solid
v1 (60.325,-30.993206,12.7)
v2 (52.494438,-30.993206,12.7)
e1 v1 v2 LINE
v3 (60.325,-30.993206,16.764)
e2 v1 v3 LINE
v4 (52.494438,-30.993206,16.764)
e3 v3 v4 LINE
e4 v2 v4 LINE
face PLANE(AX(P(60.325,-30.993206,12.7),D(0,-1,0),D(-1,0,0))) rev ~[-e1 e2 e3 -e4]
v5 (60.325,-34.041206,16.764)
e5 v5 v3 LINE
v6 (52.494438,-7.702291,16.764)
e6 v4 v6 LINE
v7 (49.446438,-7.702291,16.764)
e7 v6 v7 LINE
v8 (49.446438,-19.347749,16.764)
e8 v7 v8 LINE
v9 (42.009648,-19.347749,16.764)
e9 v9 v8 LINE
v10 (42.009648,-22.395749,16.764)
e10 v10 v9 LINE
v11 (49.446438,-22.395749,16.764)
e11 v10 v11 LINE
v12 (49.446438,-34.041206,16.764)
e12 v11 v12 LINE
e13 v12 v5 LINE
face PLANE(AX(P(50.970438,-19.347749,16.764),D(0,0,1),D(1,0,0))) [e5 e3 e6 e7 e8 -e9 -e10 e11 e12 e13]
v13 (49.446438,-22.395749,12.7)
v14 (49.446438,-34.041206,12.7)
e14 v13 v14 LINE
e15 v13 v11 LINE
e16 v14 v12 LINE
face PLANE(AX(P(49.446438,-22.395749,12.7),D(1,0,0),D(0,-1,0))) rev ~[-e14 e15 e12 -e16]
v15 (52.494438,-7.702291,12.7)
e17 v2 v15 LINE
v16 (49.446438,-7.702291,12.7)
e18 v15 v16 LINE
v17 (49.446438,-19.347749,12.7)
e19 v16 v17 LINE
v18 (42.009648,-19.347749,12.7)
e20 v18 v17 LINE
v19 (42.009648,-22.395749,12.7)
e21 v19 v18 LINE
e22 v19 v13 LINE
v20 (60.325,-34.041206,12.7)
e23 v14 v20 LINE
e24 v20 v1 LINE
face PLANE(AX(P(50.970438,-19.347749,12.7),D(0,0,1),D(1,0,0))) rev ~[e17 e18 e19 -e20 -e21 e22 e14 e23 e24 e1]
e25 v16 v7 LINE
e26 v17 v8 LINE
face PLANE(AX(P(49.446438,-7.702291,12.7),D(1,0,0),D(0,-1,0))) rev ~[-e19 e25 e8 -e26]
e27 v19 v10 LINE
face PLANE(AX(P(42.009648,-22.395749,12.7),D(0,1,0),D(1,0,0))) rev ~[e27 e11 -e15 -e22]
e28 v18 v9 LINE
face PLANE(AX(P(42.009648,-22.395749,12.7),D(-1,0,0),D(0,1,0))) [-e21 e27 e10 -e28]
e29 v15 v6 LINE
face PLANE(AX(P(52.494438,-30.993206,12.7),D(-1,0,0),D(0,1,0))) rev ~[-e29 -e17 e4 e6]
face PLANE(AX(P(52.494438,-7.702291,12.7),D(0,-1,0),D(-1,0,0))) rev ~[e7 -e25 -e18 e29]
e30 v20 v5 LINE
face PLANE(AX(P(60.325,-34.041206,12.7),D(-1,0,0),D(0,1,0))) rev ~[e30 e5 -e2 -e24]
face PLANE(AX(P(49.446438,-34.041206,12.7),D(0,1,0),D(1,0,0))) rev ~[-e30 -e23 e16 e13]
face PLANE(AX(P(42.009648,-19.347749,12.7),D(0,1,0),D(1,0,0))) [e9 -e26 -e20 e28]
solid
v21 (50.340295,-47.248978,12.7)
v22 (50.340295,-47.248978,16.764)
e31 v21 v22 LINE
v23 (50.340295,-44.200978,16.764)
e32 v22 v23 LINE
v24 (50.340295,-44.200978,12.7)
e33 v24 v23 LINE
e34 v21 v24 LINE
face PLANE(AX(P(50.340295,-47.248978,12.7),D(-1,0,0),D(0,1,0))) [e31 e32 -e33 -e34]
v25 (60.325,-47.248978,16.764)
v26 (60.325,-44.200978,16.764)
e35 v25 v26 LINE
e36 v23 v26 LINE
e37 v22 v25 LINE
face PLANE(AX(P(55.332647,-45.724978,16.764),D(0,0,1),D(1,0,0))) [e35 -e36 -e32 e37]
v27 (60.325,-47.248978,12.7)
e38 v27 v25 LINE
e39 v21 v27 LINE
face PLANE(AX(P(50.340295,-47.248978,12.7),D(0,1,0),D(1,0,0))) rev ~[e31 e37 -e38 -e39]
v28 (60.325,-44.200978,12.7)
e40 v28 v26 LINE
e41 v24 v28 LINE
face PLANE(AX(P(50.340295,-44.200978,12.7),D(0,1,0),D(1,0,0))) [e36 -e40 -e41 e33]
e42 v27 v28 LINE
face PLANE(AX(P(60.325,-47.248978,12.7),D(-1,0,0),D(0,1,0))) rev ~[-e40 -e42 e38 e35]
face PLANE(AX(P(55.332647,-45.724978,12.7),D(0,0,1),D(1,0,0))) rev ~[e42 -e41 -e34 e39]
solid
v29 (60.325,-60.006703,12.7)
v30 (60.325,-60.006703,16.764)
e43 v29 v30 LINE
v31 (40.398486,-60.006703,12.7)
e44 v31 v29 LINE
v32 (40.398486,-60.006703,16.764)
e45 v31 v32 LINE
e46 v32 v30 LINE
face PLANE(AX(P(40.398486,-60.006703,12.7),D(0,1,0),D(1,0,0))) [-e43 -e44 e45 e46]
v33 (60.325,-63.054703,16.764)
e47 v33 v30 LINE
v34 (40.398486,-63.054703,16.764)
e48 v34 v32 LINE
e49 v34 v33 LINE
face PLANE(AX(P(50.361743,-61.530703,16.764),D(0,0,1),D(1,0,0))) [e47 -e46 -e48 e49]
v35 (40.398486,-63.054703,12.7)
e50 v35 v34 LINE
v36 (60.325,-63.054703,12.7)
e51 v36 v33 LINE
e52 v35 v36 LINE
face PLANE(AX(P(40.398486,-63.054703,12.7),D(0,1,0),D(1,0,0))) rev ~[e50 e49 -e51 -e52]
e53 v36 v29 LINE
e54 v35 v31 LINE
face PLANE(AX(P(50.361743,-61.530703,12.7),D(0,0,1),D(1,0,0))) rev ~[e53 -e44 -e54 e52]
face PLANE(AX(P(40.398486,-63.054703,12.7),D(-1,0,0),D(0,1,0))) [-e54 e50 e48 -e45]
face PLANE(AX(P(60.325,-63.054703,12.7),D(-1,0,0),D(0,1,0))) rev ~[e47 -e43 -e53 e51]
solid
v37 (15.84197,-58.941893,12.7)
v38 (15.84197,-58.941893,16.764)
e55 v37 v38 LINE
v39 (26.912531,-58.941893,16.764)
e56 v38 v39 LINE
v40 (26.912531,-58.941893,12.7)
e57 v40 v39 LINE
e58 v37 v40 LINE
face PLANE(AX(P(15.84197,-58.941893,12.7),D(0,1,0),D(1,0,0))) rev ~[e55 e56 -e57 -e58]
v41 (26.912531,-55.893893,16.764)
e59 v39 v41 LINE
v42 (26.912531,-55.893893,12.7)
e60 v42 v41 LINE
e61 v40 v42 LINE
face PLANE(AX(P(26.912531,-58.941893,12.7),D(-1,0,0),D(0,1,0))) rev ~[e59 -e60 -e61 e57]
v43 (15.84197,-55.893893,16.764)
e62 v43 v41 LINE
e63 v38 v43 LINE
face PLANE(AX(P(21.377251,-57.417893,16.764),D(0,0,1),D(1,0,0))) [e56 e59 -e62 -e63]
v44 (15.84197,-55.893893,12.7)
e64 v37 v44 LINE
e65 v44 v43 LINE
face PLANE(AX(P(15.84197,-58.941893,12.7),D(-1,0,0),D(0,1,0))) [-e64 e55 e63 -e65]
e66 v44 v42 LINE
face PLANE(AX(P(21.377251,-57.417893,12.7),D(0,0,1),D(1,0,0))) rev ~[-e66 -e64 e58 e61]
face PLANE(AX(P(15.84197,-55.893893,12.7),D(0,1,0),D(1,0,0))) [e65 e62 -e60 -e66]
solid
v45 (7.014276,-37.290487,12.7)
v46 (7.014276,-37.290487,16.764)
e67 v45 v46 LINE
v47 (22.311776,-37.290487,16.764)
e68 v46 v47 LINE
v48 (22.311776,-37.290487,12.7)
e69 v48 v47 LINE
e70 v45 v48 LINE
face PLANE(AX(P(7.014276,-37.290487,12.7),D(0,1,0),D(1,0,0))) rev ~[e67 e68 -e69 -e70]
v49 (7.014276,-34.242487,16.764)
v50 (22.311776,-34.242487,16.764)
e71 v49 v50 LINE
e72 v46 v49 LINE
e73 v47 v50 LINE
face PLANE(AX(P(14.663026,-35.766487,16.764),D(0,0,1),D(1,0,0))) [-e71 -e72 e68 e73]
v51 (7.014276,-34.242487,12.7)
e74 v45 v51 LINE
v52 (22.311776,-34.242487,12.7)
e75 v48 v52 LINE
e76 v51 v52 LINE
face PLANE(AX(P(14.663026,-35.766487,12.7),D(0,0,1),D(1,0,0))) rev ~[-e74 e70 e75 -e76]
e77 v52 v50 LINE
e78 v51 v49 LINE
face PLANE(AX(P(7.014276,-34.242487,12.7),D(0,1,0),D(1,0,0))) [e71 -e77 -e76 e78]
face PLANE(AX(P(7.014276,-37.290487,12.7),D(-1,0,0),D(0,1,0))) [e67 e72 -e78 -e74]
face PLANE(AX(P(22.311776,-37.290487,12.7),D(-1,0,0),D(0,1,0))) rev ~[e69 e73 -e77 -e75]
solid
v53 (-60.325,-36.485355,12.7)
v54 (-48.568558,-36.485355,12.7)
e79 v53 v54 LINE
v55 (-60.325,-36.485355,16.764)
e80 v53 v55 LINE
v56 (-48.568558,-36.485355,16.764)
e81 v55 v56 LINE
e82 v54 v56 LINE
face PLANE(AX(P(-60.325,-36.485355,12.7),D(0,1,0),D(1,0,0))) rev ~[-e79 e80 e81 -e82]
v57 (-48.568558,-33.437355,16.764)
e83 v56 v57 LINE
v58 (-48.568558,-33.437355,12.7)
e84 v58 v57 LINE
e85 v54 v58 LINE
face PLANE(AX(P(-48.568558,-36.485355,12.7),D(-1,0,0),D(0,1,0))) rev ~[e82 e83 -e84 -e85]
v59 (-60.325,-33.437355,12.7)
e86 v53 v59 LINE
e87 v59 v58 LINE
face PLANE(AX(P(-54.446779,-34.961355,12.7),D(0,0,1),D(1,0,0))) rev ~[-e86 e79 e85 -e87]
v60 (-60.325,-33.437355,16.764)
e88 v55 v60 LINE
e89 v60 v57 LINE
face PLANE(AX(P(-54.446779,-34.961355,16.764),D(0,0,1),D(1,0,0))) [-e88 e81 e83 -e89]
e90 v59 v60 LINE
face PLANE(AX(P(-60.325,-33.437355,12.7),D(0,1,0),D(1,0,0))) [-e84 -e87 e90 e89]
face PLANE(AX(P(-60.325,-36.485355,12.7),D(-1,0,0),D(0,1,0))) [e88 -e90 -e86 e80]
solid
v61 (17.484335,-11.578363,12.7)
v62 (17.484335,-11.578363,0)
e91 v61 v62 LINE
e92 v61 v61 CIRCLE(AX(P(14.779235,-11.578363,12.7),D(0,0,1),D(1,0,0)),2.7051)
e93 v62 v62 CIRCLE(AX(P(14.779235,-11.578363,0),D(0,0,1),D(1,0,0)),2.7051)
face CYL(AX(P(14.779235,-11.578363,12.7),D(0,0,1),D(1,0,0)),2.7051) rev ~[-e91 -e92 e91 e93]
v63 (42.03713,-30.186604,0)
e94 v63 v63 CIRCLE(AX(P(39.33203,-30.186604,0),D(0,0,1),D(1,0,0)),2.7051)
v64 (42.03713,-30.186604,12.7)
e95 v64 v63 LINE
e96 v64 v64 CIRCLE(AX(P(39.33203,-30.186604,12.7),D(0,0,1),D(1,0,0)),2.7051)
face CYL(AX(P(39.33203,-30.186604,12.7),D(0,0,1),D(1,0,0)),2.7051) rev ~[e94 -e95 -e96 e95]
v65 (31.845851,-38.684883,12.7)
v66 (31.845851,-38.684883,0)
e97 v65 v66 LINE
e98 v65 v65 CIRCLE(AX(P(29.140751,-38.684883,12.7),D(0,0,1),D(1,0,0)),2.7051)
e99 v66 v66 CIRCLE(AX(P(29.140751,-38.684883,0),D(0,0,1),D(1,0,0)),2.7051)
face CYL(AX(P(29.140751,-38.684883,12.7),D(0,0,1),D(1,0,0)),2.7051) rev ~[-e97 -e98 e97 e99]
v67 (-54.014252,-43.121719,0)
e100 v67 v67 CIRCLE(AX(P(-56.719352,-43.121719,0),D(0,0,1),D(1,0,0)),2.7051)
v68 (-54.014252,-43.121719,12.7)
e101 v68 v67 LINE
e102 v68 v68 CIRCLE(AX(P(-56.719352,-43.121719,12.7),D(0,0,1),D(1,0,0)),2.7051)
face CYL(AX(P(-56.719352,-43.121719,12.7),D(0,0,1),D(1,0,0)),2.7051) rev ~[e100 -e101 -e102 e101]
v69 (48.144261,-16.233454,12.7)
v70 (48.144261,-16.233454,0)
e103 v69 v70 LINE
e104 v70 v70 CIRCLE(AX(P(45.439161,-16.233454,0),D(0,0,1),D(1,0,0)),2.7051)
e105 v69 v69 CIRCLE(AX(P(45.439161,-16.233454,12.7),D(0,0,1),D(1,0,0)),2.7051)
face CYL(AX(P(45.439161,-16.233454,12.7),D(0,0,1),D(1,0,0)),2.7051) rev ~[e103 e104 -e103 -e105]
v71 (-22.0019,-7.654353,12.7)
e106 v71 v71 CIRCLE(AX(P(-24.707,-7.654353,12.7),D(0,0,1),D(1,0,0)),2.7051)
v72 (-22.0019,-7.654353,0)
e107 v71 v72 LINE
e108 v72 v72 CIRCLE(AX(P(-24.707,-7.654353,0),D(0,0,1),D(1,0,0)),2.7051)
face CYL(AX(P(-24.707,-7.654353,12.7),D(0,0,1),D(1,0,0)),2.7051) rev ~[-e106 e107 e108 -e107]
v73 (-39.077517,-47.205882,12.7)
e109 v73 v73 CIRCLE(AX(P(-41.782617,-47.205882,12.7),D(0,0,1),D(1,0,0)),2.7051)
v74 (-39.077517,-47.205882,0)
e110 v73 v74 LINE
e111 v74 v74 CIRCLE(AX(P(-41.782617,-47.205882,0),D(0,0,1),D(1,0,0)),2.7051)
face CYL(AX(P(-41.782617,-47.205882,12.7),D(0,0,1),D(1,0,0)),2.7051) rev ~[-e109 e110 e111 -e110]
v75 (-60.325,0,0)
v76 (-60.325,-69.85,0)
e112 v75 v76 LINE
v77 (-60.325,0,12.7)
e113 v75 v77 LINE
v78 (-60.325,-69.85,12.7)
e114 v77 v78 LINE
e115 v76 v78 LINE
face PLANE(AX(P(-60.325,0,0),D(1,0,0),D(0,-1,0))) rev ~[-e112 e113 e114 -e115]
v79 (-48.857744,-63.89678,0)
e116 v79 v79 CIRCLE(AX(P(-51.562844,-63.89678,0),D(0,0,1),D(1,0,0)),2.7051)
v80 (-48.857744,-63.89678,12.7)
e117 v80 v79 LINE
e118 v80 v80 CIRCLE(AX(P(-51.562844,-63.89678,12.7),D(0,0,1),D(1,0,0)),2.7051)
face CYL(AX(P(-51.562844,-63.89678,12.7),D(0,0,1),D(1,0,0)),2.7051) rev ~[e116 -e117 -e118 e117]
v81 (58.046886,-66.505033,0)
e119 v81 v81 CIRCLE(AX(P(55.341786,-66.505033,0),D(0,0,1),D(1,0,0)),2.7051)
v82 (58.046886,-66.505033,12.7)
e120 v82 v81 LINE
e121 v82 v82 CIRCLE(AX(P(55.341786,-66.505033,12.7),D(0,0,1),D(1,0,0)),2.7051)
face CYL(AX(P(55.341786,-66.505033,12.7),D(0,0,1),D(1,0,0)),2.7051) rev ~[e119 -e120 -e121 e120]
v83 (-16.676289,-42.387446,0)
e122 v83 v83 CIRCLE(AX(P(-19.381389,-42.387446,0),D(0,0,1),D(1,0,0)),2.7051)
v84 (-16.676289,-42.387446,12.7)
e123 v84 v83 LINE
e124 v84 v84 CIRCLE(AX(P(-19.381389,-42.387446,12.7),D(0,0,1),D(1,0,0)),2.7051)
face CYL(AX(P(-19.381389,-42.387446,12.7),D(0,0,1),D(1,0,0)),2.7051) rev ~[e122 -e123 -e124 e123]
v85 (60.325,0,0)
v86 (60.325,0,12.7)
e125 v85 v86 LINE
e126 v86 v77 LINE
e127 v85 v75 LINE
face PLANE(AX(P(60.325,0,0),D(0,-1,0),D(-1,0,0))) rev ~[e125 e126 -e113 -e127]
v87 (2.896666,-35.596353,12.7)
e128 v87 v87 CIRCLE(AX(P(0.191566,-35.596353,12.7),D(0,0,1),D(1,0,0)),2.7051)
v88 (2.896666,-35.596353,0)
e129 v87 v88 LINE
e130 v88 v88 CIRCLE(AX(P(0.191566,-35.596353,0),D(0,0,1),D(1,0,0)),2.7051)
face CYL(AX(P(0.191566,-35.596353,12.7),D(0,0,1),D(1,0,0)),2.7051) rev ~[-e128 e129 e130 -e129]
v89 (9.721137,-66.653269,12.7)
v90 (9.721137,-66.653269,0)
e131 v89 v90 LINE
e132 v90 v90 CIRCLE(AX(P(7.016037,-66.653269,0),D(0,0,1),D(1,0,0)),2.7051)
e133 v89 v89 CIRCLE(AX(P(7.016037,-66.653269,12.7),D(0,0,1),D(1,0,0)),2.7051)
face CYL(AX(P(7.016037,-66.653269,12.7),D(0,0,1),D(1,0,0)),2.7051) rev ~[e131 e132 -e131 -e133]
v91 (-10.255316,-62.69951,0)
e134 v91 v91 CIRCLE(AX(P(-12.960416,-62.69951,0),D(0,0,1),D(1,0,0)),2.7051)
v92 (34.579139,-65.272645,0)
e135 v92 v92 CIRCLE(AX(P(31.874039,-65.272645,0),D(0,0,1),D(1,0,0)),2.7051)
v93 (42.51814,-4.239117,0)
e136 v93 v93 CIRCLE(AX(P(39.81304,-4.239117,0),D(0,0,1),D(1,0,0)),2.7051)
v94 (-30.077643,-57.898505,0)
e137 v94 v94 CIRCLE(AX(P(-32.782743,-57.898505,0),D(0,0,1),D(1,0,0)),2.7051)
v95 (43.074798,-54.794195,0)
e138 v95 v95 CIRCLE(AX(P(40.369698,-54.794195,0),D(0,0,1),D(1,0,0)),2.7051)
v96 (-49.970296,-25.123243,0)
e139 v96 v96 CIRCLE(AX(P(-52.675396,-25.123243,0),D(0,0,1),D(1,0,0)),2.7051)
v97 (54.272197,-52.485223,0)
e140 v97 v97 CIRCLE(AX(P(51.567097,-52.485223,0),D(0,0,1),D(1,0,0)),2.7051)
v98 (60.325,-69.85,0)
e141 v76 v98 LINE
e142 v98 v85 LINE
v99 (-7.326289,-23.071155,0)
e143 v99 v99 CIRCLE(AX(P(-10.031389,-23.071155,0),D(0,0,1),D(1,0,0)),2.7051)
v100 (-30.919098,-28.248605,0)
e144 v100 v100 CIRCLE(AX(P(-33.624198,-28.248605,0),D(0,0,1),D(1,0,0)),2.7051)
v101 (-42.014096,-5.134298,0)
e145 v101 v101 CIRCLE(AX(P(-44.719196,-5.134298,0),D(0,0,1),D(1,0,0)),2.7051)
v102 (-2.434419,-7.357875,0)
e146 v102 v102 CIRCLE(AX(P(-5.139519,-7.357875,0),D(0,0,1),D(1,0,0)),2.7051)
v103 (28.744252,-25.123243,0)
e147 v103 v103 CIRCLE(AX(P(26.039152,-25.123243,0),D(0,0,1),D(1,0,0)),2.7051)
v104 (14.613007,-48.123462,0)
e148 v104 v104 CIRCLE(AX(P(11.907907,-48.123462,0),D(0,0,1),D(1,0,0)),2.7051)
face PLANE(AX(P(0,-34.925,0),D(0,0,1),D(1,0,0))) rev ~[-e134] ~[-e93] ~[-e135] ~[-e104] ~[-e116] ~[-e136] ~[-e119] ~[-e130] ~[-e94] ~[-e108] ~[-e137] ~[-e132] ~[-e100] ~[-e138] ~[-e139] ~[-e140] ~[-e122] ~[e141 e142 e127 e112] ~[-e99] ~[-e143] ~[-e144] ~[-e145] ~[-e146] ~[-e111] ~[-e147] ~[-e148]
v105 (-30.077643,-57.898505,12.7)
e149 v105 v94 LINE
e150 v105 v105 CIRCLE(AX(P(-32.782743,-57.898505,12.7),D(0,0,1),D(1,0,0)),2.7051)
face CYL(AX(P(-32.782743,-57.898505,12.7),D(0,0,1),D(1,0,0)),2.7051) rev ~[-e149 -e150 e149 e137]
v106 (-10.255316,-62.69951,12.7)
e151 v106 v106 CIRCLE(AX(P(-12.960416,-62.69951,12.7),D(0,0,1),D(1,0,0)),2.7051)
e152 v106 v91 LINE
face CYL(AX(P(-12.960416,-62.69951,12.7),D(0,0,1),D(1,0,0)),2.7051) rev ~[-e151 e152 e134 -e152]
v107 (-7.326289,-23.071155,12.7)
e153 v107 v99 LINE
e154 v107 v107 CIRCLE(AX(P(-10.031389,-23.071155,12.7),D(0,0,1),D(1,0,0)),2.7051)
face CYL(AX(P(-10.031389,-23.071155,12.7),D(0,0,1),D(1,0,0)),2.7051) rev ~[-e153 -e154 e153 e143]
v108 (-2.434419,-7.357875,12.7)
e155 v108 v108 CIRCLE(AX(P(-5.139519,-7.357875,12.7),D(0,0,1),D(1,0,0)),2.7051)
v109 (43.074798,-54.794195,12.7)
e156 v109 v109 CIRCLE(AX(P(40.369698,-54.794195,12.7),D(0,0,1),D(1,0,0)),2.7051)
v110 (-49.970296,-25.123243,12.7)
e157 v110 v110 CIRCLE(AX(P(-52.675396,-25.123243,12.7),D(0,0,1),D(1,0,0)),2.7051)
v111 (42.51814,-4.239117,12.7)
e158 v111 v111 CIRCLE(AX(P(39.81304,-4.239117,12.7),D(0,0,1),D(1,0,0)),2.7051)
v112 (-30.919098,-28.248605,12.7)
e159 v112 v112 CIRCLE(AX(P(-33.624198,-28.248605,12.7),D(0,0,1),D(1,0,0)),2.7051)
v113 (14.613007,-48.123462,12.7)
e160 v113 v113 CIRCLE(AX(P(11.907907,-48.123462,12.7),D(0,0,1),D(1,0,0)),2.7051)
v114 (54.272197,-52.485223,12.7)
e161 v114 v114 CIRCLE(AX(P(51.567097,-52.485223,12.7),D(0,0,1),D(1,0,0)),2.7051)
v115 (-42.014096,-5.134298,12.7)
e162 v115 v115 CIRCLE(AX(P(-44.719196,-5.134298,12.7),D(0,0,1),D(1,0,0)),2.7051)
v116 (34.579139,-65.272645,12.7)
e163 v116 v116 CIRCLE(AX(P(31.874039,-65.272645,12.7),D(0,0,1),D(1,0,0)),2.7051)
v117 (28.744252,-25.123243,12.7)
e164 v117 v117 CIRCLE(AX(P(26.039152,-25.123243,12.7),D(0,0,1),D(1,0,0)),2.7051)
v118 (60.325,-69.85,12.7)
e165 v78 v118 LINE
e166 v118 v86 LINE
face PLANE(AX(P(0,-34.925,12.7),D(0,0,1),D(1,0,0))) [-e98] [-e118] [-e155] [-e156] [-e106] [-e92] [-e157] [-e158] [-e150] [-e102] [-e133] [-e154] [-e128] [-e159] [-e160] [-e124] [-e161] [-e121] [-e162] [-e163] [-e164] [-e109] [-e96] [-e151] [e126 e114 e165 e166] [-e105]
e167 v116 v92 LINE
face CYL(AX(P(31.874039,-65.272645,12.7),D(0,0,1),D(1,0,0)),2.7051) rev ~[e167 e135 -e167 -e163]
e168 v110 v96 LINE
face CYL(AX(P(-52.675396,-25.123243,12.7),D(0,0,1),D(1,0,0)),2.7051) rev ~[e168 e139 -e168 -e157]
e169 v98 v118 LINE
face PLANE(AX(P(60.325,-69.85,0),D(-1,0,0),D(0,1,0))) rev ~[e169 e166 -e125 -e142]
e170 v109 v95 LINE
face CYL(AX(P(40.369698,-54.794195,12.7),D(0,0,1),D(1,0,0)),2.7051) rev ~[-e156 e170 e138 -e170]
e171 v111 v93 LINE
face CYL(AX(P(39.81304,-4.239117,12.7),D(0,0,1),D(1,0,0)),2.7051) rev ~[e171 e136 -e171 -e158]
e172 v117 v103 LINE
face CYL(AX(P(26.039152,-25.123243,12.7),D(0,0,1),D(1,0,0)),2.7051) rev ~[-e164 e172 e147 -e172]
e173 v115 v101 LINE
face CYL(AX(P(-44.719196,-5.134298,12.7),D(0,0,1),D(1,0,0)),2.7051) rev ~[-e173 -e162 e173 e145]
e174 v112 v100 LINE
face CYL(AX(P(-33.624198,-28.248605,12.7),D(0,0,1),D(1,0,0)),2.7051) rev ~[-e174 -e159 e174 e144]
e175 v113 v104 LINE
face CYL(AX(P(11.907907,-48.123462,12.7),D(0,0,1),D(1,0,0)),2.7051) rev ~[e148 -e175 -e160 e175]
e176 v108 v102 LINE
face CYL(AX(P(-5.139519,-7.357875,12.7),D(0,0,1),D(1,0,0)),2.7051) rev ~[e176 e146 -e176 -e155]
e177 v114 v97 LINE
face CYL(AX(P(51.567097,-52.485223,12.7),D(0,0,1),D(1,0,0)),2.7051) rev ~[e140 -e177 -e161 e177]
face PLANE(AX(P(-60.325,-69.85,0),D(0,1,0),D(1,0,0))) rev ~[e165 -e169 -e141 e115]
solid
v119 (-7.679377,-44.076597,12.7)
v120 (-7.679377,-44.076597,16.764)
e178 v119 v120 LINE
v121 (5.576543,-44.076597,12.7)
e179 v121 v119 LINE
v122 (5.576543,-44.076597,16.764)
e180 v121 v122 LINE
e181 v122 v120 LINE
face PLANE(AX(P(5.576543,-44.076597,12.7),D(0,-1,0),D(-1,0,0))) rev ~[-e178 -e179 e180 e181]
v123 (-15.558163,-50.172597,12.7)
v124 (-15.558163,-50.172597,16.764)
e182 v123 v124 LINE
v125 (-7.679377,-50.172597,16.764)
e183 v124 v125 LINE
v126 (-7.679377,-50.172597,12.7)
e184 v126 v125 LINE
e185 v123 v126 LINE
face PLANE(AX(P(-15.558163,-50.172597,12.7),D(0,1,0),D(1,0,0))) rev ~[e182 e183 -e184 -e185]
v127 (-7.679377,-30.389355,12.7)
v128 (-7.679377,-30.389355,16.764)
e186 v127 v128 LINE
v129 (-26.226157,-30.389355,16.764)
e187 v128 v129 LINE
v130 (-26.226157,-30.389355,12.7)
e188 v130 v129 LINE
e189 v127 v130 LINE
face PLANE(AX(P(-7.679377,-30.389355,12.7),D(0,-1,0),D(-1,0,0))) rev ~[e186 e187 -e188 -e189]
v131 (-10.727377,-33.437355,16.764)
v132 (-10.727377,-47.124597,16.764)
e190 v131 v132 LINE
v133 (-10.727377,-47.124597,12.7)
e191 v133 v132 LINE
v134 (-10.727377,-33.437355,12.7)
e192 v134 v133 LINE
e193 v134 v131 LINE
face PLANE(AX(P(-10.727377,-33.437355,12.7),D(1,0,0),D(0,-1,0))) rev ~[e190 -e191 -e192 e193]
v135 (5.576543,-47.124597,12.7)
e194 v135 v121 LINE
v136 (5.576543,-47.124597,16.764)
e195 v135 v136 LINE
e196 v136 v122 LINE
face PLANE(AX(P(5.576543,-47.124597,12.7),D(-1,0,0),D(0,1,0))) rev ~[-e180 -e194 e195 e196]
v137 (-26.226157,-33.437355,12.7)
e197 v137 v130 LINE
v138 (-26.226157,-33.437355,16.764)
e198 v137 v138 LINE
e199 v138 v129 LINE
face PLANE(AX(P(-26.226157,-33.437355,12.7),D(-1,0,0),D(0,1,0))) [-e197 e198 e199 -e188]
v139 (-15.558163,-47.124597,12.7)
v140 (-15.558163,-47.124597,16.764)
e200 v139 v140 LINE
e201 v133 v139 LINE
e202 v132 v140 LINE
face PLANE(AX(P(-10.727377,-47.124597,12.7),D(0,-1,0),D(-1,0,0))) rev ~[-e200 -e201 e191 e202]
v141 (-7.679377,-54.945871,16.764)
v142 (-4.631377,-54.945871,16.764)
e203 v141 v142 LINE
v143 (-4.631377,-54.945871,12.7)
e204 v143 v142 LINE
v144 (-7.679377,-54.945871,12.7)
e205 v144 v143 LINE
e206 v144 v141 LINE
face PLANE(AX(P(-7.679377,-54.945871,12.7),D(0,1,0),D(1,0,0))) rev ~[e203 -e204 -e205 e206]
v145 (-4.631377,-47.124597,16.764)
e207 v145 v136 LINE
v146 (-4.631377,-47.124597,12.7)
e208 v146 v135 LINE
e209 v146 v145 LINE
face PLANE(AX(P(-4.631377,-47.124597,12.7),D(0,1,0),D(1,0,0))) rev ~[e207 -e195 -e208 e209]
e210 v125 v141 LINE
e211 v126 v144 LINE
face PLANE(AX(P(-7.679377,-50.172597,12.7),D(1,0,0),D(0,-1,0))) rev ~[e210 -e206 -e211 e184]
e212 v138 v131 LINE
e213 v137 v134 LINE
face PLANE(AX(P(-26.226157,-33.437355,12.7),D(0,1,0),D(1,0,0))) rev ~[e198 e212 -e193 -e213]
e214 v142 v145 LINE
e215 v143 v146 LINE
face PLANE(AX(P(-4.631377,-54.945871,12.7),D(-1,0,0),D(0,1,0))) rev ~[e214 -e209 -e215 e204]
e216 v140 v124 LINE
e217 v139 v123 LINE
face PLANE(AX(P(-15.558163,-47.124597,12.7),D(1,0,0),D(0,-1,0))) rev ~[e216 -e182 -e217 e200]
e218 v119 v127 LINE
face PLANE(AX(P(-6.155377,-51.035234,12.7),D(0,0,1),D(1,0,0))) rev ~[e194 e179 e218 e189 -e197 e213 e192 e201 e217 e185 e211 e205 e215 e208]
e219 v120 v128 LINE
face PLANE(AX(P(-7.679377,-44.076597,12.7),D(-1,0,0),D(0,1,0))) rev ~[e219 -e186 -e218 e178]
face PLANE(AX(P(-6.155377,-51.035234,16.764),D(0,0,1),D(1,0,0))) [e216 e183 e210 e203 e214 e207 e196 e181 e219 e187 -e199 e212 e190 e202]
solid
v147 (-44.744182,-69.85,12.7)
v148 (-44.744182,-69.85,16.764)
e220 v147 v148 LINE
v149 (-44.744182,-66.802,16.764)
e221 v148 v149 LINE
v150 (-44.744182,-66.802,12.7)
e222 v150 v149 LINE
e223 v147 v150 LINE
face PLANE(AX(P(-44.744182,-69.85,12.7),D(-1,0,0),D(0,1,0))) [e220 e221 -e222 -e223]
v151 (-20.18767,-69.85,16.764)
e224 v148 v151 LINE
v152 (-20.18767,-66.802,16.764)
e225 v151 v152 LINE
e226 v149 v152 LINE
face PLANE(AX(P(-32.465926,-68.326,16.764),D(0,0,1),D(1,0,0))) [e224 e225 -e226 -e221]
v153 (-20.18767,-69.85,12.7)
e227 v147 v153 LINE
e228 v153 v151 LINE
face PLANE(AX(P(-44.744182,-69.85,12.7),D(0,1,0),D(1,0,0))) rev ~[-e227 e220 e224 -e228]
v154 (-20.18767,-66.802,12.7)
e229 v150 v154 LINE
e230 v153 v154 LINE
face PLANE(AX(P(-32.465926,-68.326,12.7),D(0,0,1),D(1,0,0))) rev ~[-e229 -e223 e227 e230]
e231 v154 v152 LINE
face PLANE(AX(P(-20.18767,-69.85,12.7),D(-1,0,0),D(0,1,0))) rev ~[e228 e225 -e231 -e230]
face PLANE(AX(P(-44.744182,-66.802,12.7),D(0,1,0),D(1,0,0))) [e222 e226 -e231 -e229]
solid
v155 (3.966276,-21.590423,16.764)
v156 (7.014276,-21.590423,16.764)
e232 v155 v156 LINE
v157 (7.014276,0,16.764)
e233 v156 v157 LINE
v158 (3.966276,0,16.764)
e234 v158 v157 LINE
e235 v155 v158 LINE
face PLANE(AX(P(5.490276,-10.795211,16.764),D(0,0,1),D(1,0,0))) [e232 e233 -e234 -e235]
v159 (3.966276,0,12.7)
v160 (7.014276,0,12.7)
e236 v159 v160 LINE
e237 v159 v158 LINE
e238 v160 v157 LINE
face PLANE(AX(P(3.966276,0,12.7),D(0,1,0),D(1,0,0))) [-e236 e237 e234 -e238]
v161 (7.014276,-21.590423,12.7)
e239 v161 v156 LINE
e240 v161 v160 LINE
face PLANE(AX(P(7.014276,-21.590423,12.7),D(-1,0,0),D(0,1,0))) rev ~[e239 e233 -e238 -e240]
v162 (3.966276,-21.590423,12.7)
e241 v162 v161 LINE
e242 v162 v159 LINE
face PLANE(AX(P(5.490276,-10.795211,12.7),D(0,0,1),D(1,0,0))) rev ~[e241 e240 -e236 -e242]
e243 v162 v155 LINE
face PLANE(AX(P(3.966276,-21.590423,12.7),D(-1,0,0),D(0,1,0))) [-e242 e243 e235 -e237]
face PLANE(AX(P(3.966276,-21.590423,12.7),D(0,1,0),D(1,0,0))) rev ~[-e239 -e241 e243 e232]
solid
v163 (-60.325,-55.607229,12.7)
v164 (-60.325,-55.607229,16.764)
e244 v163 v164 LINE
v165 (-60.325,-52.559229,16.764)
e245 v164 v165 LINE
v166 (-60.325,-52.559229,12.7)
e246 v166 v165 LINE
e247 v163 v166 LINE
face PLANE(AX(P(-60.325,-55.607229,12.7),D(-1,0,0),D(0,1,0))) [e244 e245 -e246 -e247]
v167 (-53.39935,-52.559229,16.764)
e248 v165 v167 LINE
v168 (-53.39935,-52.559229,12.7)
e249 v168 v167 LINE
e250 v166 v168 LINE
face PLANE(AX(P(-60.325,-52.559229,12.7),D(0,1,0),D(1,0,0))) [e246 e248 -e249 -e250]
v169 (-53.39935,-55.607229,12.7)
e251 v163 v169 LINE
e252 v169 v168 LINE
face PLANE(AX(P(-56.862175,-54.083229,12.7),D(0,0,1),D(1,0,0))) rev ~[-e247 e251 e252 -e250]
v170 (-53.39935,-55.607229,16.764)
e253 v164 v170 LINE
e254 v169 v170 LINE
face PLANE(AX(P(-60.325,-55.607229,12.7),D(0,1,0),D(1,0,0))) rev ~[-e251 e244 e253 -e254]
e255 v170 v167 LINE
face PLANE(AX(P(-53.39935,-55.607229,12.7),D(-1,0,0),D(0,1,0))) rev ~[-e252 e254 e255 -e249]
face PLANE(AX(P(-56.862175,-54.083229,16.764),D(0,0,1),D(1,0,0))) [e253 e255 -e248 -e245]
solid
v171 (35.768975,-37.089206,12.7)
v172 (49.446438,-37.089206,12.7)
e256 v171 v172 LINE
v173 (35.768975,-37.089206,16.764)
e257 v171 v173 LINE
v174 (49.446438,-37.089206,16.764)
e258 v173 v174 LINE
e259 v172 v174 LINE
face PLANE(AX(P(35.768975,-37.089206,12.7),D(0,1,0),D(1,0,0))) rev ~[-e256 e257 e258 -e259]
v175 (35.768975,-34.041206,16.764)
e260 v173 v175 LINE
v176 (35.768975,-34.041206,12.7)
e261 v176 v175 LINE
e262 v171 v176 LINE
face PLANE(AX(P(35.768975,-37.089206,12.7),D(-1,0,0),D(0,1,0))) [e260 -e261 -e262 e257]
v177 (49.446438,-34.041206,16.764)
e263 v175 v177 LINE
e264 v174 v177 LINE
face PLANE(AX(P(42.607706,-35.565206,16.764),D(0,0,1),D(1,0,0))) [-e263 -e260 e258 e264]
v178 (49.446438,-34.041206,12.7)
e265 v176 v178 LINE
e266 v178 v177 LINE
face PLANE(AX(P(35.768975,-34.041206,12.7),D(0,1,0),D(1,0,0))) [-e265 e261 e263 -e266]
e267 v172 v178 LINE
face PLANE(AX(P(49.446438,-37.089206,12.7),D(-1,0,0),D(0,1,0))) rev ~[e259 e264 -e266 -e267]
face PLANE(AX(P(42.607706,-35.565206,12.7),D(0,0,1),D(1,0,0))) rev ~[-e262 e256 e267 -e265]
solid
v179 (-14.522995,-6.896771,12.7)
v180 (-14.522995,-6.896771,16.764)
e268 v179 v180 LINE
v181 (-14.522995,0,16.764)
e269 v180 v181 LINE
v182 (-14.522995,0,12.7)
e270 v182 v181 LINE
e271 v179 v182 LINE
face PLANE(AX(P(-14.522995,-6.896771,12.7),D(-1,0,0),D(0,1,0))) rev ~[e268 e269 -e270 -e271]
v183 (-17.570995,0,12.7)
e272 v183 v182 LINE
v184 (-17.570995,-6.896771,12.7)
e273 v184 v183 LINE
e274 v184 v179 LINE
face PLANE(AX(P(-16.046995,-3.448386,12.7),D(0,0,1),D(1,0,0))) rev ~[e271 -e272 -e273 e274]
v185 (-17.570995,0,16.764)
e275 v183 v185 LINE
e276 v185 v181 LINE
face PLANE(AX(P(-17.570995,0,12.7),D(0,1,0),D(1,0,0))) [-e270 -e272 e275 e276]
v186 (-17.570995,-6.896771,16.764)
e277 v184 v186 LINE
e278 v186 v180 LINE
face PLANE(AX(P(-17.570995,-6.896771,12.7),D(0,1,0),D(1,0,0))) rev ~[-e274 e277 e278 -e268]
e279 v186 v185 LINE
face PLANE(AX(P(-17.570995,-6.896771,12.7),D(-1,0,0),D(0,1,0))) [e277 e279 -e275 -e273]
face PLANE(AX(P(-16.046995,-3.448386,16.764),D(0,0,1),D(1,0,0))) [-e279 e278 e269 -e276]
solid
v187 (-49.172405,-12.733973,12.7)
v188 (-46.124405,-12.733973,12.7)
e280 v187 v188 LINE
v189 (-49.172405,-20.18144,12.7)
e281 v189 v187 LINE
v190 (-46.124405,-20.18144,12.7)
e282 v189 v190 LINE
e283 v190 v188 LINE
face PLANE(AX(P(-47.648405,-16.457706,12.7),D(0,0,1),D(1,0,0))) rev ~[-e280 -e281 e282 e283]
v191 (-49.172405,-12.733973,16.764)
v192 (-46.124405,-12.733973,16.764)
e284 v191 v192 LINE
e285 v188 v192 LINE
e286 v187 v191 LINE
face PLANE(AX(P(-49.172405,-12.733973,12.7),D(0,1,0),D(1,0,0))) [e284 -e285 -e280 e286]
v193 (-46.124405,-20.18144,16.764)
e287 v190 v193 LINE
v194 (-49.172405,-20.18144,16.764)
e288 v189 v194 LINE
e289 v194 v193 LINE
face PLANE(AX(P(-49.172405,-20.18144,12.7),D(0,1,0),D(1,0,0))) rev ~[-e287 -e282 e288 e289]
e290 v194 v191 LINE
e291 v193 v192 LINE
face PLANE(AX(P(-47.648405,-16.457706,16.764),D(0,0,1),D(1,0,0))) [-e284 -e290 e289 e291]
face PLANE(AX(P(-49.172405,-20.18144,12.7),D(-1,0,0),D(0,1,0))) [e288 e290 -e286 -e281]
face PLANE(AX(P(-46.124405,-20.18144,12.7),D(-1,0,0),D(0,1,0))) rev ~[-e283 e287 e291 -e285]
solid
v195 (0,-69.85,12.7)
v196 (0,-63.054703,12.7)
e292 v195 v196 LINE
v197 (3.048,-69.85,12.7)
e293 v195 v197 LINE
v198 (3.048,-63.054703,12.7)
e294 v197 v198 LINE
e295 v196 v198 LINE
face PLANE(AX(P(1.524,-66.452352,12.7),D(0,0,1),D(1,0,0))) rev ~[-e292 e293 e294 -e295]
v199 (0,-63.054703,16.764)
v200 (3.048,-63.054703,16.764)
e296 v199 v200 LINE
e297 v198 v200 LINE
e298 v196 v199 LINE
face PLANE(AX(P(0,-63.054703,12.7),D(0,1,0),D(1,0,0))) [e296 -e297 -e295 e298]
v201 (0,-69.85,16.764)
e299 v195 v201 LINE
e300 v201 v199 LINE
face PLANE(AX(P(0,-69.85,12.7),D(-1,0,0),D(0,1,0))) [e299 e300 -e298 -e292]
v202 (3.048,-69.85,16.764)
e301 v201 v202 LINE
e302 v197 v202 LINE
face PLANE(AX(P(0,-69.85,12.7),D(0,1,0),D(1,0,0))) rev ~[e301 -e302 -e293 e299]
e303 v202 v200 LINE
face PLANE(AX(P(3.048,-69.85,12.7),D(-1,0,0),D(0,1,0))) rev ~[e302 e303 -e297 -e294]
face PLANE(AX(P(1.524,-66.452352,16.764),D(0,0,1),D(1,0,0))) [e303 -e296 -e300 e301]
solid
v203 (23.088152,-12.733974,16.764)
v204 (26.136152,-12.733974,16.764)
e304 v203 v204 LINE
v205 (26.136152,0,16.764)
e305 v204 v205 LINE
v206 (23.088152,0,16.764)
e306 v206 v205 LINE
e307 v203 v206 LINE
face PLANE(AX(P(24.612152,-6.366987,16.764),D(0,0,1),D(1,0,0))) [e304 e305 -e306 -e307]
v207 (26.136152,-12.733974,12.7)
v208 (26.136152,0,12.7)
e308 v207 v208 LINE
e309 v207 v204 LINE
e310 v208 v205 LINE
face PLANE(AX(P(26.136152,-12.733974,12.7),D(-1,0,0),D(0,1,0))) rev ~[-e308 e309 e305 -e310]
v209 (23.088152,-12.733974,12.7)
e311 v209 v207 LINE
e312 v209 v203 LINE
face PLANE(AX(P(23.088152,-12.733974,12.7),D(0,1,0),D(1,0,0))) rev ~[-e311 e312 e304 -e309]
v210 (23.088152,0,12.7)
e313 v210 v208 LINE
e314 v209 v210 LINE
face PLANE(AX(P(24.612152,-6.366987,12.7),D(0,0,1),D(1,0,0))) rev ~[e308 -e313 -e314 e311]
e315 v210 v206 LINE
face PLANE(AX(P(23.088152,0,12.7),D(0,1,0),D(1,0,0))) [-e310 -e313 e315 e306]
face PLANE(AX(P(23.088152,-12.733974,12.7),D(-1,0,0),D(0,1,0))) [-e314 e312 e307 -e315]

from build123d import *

# Parameters (mm, degrees)
F1_DEPTH = 12.7
F2_R     = 2.7051
F3_DEPTH = 12.701
F4_DEPTH = 12.701
F5_W     = 7.4367895722
F5_H     = 3.048
F6_DEPTH = 4.064
F5_W_2   = 13.6774629354
F5_W_3   = 9.984705162
F5_W_4   = 19.9265140414
F5_W_5   = 11.0705606639
F5_W_6   = 3.048
F5_H_2   = 6.795296824
F5_W_7   = 15.4987806454
F5_H_3   = 7.4474671856
F5_H_4   = 6.8967710249
F5_H_5   = 21.5904228389
F5_H_6   = 12.7339735627
F5_W_8   = 15.297499951
F5_W_9   = 24.5565120131
F5_W_10  = 6.9256495059
F5_W_11  = 11.7564420521


# Not quite as in the source:
# - a feature names something its author has since deleted; it is built from what else it names


with BuildPart() as f1:
    # F0 (on Top) → F1 (new body)
    with BuildSketch(Plane.XY):
        Polygon((0, 0), (-60.325, 0), (-60.325, -69.85), (60.325, -69.85), (60.325, 0), align=None)
    extrude(amount=F1_DEPTH)

    # F2 (on face) → F3 (cut, through all)
    with BuildSketch(Plane.XY.offset(12.7)):
        with Locations((26.0391515287, -25.1232429502)):
            Circle(F2_R)
        with Locations((39.3320303045, -30.1866039911)):
            Circle(F2_R)
        with Locations((51.5670966979, -52.4852229461)):
            Circle(F2_R)
        with Locations((40.3696976448, -54.7941951459)):
            Circle(F2_R)
        with Locations((29.1407505167, -38.6848830029)):
            Circle(F2_R)
        with Locations((39.813039536, -4.2391167363)):
            Circle(F2_R)
        with Locations((14.7792350719, -11.5783627619)):
            Circle(F2_R)
        with Locations((-5.1395187476, -7.3578745587)):
            Circle(F2_R)
        with Locations((-10.0313894829, -23.0711551039)):
            Circle(F2_R)
        with Locations((0.1915656628, -35.5963533331)):
            Circle(F2_R)
        with Locations((11.9079070905, -48.1234616893)):
            Circle(F2_R)
        with Locations((-19.3813890983, -42.3874461546)):
            Circle(F2_R)
        with Locations((-24.7069996912, -7.6543525113)):
            Circle(F2_R)
        with Locations((-33.624197891, -28.248605245)):
            Circle(F2_R)
        with Locations((-32.7827430181, -57.898504717)):
            Circle(F2_R)
        with Locations((-12.9604163302, -62.6995104729)):
            Circle(F2_R)
        with Locations((7.0160373541, -66.6532692993)):
            Circle(F2_R)
        with Locations((31.8740387344, -65.2726447941)):
            Circle(F2_R)
        with Locations((55.3417858057, -66.5050328202)):
            Circle(F2_R)
        with Locations((-41.7826166632, -47.2058818733)):
            Circle(F2_R)
        with Locations((-56.7193522528, -43.1217187759)):
            Circle(F2_R)
        with Locations((-52.6753959628, -25.1232429502)):
            Circle(F2_R)
        with Locations((-44.7191960654, -5.1342979052)):
            Circle(F2_R)
        with Locations((-51.5628442894, -63.8967803387)):
            Circle(F2_R)
    extrude(amount=-F3_DEPTH, mode=Mode.SUBTRACT)

    # F2 (on face) → F4 (cut, through all)
    with BuildSketch(Plane.XY.offset(12.7)):
        with Locations((45.4391605129, -16.2334538194)):
            Circle(F2_R)
    extrude(amount=-F4_DEPTH, mode=Mode.SUBTRACT)


with BuildPart() as f6:
    # F5 (on face) → F6 (new body)
    with BuildSketch(Plane.XY.offset(12.7)):
        Polygon((52.4944375079, -7.7022910118), (49.4464375079, -7.7022910118), (49.4464375079, -19.3477486451), (49.4464375079, -22.3957486451), (49.4464375079, -30.9932062783), (52.4944375079, -30.9932062783), align=None)
        with Locations((45.7280427217, -20.8717486451)):
            Rectangle(F5_W, F5_H)
        Polygon((60.325, -30.9932062783), (52.4944375079, -30.9932062783), (49.4464375079, -30.9932062783), (49.4464375079, -34.0412062783), (60.325, -34.0412062783), align=None)
    extrude(amount=F6_DEPTH)


with BuildPart() as f6b:
    # F5 (on face) → F6, piece 2 (new body)
    with BuildSketch(Plane.XY.offset(12.7)):
        with Locations((42.6077060401, -35.5652062783)):
            Rectangle(F5_W_2, F5_H)
    extrude(amount=F6_DEPTH)


with BuildPart() as f6c:
    # F5 (on face) → F6, piece 3 (new body)
    with BuildSketch(Plane.XY.offset(12.7)):
        with Locations((55.332647419, -45.7249781678)):
            Rectangle(F5_W_3, F5_H)
    extrude(amount=F6_DEPTH)


with BuildPart() as f6d:
    # F5 (on face) → F6, piece 4 (new body)
    with BuildSketch(Plane.XY.offset(12.7)):
        with Locations((50.3617429793, -61.530703176)):
            Rectangle(F5_W_4, F5_H)
    extrude(amount=F6_DEPTH)


with BuildPart() as f6e:
    # F5 (on face) → F6, piece 5 (new body)
    with BuildSketch(Plane.XY.offset(12.7)):
        with Locations((21.3772505522, -57.4178932796)):
            Rectangle(F5_W_5, F5_H)
    extrude(amount=F6_DEPTH)


with BuildPart() as f6f:
    # F5 (on face) → F6, piece 6 (new body)
    with BuildSketch(Plane.XY.offset(12.7)):
        with Locations((1.524, -66.452351588)):
            Rectangle(F5_W_6, F5_H_2)
    extrude(amount=F6_DEPTH)


with BuildPart() as f6g:
    # F5 (on face) → F6, piece 7 (new body)
    with BuildSketch(Plane.XY.offset(12.7)):
        Polygon((-4.6313766771, -47.1245971699), (-7.6793766771, -47.1245971699), (-7.6793766771, -50.1725971699), (-7.6793766771, -54.9458710858), (-4.6313766771, -54.9458710858), align=None)
        Polygon((-7.6793766771, -47.1245971699), (-10.7273766771, -47.1245971699), (-15.5581627041, -47.1245971699), (-15.5581627041, -50.1725971699), (-7.6793766771, -50.1725971699), align=None)
        Polygon((-7.6793766771, -30.3893553474), (-10.7273766771, -30.3893553474), (-10.7273766771, -33.4373553474), (-10.7273766771, -47.1245971699), (-7.6793766771, -47.1245971699), (-7.6793766771, -44.0765971699), align=None)
        Polygon((5.5765425786, -44.0765971699), (-7.6793766771, -44.0765971699), (-7.6793766771, -47.1245971699), (-4.6313766771, -47.1245971699), (5.5765425786, -47.1245971699), align=None)
        with Locations((-18.4767669998, -31.9133553474)):
            Rectangle(F5_W_7, F5_H)
    extrude(amount=F6_DEPTH)


with BuildPart() as f6h:
    # F5 (on face) → F6, piece 8 (new body)
    with BuildSketch(Plane.XY.offset(12.7)):
        with Locations((-47.6484051535, -16.4577062242)):
            Rectangle(F5_W_6, F5_H_3)
    extrude(amount=F6_DEPTH)


with BuildPart() as f6i:
    # F5 (on face) → F6, piece 9 (new body)
    with BuildSketch(Plane.XY.offset(12.7)):
        with Locations((-16.0469947944, -3.4483855125)):
            Rectangle(F5_W_6, F5_H_4)
    extrude(amount=F6_DEPTH)


with BuildPart() as f6j:
    # F5 (on face) → F6, piece 10 (new body)
    with BuildSketch(Plane.XY.offset(12.7)):
        with Locations((5.4902756026, -10.7952114195)):
            Rectangle(F5_W_6, F5_H_5)
    extrude(amount=F6_DEPTH)


with BuildPart() as f6k:
    # F5 (on face) → F6, piece 11 (new body)
    with BuildSketch(Plane.XY.offset(12.7)):
        with Locations((24.612151589, -6.3669867814)):
            Rectangle(F5_W_6, F5_H_6)
    extrude(amount=F6_DEPTH)


with BuildPart() as f6l:
    # F5 (on face) → F6, piece 12 (new body)
    with BuildSketch(Plane.XY.offset(12.7)):
        with Locations((14.6630255781, -35.7664874384)):
            Rectangle(F5_W_8, F5_H)
    extrude(amount=F6_DEPTH)


with BuildPart() as f6m:
    # F5 (on face) → F6, piece 13 (new body)
    with BuildSketch(Plane.XY.offset(12.7)):
        with Locations((-32.4659263715, -68.326)):
            Rectangle(F5_W_9, F5_H)
    extrude(amount=F6_DEPTH)


with BuildPart() as f6n:
    # F5 (on face) → F6, piece 14 (new body)
    with BuildSketch(Plane.XY.offset(12.7)):
        with Locations((-56.8621752471, -54.0832294712)):
            Rectangle(F5_W_10, F5_H)
    extrude(amount=F6_DEPTH)


with BuildPart() as f6o:
    # F5 (on face) → F6, piece 15 (new body)
    with BuildSketch(Plane.XY.offset(12.7)):
        with Locations((-54.4467789739, -34.9613553474)):
            Rectangle(F5_W_11, F5_H)
    extrude(amount=F6_DEPTH)


solid = Compound([f1.part, f6.part, f6b.part, f6c.part, f6d.part, f6e.part, f6f.part, f6g.part, f6h.part, f6i.part, f6j.part, f6k.part, f6l.part, f6m.part, f6n.part, f6o.part])
